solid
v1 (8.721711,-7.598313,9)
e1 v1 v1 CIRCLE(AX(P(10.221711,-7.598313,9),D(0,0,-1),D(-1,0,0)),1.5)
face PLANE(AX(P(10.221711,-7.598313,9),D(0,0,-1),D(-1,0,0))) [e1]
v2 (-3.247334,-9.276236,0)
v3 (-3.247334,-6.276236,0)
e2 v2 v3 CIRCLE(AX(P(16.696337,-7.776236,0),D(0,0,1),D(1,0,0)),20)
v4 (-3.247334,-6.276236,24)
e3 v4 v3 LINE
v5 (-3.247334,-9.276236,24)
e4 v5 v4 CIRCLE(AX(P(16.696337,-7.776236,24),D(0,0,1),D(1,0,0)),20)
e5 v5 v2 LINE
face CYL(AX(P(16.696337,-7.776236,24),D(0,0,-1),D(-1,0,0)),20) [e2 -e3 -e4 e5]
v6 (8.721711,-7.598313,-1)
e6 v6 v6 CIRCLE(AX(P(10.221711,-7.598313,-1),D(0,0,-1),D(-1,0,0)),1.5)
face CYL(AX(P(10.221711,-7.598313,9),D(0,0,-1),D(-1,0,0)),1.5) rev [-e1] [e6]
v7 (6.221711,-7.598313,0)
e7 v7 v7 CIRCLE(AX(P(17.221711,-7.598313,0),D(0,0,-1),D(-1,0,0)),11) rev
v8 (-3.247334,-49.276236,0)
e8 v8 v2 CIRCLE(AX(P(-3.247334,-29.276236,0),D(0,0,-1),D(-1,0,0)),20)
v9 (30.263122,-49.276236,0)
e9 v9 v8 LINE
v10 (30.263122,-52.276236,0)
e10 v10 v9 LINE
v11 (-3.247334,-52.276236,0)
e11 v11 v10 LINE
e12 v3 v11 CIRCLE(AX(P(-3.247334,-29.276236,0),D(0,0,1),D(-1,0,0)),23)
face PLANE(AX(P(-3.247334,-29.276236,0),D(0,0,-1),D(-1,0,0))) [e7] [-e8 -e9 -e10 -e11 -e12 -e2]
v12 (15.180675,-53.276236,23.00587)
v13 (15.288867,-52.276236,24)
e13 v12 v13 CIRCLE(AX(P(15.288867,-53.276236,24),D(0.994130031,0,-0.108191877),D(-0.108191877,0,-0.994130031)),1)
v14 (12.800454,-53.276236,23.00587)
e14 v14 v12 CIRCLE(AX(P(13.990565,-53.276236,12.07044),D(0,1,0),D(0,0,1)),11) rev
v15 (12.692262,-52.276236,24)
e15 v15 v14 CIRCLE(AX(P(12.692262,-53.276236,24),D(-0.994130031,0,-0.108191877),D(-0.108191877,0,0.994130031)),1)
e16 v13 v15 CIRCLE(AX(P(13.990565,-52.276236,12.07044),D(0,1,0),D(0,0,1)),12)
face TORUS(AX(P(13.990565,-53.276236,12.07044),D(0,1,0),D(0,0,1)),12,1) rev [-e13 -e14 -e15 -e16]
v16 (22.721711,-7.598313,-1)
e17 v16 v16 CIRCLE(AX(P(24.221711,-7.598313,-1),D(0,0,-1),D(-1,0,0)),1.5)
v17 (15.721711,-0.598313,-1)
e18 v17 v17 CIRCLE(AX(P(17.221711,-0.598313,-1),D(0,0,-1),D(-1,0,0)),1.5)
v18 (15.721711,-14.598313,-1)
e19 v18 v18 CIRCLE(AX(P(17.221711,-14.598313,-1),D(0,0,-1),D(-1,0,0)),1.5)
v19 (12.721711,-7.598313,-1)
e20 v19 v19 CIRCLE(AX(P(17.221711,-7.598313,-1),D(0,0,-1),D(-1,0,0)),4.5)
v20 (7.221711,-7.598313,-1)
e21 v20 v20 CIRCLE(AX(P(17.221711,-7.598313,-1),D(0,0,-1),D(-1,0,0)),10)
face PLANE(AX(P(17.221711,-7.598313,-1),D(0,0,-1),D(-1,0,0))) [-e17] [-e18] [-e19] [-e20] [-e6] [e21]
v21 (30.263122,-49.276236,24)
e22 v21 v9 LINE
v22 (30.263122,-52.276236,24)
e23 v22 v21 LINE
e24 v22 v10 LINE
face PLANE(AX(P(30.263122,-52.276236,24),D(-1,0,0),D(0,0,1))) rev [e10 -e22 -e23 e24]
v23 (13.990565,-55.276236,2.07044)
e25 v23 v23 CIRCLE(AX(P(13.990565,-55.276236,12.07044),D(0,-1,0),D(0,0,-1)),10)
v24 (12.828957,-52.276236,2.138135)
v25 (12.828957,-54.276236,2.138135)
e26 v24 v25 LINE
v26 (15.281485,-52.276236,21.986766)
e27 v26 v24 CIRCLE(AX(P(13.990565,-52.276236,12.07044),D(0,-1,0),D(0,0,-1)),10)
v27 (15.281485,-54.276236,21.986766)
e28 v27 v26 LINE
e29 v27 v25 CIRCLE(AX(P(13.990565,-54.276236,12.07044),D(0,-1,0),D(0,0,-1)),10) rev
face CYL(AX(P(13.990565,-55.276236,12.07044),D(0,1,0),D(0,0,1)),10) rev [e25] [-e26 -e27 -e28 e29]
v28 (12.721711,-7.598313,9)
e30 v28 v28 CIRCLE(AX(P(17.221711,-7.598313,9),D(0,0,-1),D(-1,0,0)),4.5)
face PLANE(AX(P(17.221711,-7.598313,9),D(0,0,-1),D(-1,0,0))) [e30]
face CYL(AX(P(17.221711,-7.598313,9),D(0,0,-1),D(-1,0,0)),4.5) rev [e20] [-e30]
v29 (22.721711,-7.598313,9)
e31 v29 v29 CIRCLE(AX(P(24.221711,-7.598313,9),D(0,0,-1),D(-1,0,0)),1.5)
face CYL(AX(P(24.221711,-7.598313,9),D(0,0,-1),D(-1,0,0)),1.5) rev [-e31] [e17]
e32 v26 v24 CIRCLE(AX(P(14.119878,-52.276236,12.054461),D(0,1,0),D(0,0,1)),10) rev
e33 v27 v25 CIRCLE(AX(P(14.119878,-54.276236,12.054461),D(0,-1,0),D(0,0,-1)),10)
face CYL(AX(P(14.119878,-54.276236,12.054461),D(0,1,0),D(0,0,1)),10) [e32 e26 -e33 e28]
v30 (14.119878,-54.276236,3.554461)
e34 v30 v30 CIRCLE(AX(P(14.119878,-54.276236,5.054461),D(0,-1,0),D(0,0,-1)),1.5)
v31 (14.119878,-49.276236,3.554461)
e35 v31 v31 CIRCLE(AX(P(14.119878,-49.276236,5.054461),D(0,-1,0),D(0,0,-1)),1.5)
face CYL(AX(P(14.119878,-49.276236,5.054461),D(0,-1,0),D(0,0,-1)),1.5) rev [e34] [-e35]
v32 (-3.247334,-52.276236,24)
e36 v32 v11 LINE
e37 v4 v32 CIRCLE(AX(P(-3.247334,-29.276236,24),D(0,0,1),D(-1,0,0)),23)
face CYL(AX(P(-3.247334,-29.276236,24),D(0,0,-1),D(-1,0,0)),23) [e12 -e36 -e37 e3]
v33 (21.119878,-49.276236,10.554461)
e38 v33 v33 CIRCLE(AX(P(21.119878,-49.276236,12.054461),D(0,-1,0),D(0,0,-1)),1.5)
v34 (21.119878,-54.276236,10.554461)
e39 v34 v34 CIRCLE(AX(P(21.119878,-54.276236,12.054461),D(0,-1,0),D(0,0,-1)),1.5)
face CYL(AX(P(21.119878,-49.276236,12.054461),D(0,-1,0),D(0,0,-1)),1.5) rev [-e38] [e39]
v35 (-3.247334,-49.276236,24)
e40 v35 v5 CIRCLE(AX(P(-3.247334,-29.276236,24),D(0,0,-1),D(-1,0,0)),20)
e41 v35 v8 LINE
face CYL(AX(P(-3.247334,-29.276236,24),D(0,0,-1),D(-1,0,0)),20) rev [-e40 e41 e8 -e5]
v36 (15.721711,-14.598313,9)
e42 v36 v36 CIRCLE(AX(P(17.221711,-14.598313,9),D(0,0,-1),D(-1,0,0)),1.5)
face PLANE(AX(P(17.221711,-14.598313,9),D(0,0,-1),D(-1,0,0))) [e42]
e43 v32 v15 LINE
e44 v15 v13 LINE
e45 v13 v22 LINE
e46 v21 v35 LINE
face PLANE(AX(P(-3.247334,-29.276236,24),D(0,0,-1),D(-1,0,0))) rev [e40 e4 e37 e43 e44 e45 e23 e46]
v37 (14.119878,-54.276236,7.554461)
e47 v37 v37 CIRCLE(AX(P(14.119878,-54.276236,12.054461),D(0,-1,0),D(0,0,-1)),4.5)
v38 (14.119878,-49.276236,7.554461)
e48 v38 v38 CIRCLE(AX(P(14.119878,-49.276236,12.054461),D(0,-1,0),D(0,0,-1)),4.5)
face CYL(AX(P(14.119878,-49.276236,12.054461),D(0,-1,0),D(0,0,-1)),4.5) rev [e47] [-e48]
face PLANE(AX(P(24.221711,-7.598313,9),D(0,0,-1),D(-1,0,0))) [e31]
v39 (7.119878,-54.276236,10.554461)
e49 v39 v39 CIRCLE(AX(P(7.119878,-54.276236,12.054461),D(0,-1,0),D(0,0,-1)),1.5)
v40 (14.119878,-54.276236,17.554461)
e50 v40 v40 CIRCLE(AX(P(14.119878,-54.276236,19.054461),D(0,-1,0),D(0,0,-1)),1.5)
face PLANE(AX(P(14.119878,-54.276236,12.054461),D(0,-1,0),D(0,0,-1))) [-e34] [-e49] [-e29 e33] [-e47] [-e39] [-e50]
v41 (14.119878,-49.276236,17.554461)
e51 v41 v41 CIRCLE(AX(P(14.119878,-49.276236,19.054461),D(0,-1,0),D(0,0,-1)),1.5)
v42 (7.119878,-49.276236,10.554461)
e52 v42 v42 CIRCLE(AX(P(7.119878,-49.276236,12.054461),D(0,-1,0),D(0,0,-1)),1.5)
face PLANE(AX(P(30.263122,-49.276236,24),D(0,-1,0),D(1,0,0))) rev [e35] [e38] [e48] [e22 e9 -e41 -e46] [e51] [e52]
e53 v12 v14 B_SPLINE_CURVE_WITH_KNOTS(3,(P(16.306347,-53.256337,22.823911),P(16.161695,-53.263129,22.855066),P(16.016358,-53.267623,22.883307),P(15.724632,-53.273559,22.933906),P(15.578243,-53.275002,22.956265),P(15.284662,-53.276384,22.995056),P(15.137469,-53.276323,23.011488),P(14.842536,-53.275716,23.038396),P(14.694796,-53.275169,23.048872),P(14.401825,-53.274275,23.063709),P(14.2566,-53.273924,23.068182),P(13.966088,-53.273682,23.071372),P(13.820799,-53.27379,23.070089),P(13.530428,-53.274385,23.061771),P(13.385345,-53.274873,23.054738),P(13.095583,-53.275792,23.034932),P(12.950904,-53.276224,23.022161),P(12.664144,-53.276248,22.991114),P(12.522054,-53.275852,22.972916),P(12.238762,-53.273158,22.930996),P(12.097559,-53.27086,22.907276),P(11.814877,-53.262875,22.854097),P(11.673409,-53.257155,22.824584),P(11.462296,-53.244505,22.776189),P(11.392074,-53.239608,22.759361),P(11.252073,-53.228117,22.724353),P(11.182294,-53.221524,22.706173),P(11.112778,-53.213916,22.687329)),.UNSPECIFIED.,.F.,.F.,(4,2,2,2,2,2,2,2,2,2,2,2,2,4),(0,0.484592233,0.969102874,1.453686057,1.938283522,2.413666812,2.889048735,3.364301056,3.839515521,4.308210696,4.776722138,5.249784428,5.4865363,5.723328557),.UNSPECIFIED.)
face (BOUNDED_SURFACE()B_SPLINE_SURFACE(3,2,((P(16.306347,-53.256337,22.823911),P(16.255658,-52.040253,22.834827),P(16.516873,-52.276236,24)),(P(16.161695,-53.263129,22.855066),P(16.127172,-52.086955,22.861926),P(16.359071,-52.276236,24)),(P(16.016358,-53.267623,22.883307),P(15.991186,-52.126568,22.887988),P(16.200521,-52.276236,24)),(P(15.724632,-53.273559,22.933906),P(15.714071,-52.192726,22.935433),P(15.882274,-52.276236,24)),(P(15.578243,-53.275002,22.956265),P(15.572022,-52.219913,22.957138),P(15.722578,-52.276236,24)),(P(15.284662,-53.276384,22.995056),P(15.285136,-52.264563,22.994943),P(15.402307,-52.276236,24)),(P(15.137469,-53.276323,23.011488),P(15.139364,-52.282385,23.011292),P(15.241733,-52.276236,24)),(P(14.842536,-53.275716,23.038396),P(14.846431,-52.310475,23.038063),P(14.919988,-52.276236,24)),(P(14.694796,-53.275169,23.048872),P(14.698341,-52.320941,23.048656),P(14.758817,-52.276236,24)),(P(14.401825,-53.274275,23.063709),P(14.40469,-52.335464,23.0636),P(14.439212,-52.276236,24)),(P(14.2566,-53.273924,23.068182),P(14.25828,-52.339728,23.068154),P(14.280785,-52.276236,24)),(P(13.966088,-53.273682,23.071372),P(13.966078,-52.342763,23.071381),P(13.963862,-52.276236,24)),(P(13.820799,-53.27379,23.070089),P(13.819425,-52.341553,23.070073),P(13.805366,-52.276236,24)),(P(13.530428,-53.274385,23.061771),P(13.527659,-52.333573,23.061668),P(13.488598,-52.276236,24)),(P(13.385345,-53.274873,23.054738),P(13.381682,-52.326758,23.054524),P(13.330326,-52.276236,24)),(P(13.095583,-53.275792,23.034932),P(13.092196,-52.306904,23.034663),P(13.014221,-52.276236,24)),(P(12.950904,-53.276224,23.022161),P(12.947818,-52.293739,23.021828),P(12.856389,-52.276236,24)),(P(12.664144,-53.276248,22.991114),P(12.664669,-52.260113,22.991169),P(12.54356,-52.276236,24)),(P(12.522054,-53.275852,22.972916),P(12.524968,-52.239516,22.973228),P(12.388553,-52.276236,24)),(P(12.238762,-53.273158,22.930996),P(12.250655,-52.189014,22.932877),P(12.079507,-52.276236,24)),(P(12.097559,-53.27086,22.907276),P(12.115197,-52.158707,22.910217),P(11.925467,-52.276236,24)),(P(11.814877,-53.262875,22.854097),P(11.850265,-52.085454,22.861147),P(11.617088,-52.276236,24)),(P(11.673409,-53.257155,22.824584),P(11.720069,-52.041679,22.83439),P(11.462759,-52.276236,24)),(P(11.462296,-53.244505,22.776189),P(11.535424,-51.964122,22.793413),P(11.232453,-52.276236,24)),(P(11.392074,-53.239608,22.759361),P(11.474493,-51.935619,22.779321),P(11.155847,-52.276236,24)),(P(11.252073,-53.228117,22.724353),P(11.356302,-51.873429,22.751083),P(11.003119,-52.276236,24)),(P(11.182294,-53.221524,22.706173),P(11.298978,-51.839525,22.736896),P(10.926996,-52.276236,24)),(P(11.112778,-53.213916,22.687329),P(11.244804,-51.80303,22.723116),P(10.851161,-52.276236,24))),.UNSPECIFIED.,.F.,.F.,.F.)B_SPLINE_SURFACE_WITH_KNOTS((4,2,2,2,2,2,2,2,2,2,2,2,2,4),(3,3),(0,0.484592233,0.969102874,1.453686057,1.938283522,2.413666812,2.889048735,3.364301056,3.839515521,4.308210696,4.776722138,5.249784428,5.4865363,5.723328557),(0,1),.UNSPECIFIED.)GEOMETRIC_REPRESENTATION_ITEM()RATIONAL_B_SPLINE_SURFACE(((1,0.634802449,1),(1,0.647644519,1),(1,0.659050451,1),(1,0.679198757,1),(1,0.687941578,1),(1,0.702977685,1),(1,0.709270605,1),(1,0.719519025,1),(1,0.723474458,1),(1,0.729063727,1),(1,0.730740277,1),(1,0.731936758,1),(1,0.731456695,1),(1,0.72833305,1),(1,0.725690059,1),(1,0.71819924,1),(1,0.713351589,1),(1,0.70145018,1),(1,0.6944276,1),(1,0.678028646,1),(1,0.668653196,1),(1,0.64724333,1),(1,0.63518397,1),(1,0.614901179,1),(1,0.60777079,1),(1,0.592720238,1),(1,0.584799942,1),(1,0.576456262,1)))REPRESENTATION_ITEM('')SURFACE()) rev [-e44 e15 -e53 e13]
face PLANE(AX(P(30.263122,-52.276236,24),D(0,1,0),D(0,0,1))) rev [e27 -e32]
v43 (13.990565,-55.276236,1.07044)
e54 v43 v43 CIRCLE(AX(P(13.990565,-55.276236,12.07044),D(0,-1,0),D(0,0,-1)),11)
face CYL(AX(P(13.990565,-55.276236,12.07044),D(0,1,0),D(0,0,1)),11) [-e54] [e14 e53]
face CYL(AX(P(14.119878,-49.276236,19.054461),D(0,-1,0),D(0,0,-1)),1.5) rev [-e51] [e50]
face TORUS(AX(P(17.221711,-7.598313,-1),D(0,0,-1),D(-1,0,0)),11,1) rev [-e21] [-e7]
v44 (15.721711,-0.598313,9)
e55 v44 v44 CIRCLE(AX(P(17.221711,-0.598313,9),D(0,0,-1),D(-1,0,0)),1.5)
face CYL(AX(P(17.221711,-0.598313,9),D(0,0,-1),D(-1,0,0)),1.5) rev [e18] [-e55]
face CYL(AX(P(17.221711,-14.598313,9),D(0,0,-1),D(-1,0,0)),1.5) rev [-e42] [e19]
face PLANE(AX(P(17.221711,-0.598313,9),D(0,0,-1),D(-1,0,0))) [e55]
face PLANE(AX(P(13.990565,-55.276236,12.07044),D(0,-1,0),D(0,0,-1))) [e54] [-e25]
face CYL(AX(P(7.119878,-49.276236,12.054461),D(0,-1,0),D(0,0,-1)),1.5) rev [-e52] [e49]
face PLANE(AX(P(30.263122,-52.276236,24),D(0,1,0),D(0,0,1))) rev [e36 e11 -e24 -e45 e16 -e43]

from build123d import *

# Parameters (mm, degrees)
BOSS_EXTRUDE1_DEPTH = 24
SKETCH2_R           = 10
BOSS_EXTRUDE2_DEPTH = 2
SKETCH3_R           = 1.5
SKETCH3_R_2         = 4.5
CUT_EXTRUDE1_DEPTH  = 5
SKETCH6_R           = 10
BOSS_EXTRUDE3_DEPTH = 1
FILLET2_R           = 1
SKETCH7_R           = 1.5
SKETCH7_R_2         = 4.5
CUT_EXTRUDE4_DEPTH  = 10
SKETCH9_R           = 11
SKETCH9_R_2         = 10
BOSS_EXTRUDE4_DEPTH = 3
FILLET3_R           = 1


with BuildPart() as part:
    # Sketch1 → Boss-Extrude1 (new body)
    with BuildSketch(Plane.XY):
        with BuildLine():
            Line((30.263122148, -52.276236142), (30.263122148, -49.276236142))
            Line((30.263122148, -49.276236142), (-3.247333847, -49.276236142))
            ThreePointArc((-3.247333847, -49.276236142), (-23.247333847, -29.276236142), (-3.247333847, -9.276236142))
            ThreePointArc((-3.247333847, -9.276236142), (36.696336828, -7.776236142), (-3.247333847, -6.276236142))
            ThreePointArc((-3.247333847, -6.276236142), (-26.247333847, -29.276236142), (-3.247333847, -52.276236142))
            Line((-3.247333847, -52.276236142), (30.263122148, -52.276236142))
        make_face()
    extrude(amount=BOSS_EXTRUDE1_DEPTH)

    # Sketch2 → Boss-Extrude2 (add)
    with BuildSketch(Plane.XZ.offset(52.276236142)):
        with Locations(Location((14.119877924, 12.054461488, 0), (0, 0, 90))):
            Circle(SKETCH2_R)
    extrude(amount=BOSS_EXTRUDE2_DEPTH)

    # Sketch3 → Cut-Extrude1 (cut)
    with BuildSketch(Plane.XZ.offset(54.276236142)):
        with Locations(Location((14.119877924, 19.054461488, 0), (0, 0, 270))):
            Circle(SKETCH3_R)
        with Locations(Location((21.119877924, 12.054461488, 0), (0, 0, 270))):
            Circle(SKETCH3_R)
        with Locations(Location((14.119877924, 5.054461488, 0), (0, 0, 270))):
            Circle(SKETCH3_R)
        with Locations(Location((7.119877924, 12.054461488, 0), (0, 0, 270))):
            Circle(SKETCH3_R)
        with Locations(Location((14.119877924, 12.054461488, 0), (0, 0, 270))):
            Circle(SKETCH3_R_2)
    extrude(amount=-CUT_EXTRUDE1_DEPTH, mode=Mode.SUBTRACT)

    # Sketch6 → Boss-Extrude3 (add)
    with BuildSketch(Plane(origin=(0, 0, 0), x_dir=(-1, 0, 0), z_dir=(0, 0, -1))):
        with Locations((-17.221710812, -7.598312744)):
            Circle(SKETCH6_R)
    extrude(amount=BOSS_EXTRUDE3_DEPTH)

    # Fillet2
    fillet2_edges = [part.edges().sort_by_distance(p)[0] for p in [
        (27.221710812, -7.598312744, 0),
    ]]
    fillet(fillet2_edges, radius=FILLET2_R - 0.0001)  # a hair under: the kernel refuses the full size

    # Sketch7 → Cut-Extrude4 (cut)
    with BuildSketch(Plane(origin=(0, 0, -1), x_dir=(-1, 0, 0), z_dir=(0, 0, -1))):
        with Locations((-17.221710812, -0.598312744)):
            Circle(SKETCH7_R)
        with Locations((-10.221710812, -7.598312744)):
            Circle(SKETCH7_R)
        with Locations((-17.221710812, -14.598312744)):
            Circle(SKETCH7_R)
        with Locations((-24.221710812, -7.598312744)):
            Circle(SKETCH7_R)
        with Locations((-17.221710812, -7.598312744)):
            Circle(SKETCH7_R_2)
    extrude(amount=-CUT_EXTRUDE4_DEPTH, mode=Mode.SUBTRACT)

    # Sketch9 → Boss-Extrude4 (add)
    with BuildSketch(Plane.XZ.offset(52.276236142)):
        with Locations(Location((13.990564712, 12.070439632, 0), (0, 0, 90))):
            Circle(SKETCH9_R)
        with Locations(Location((13.990564712, 12.070439632, 0), (0, 0, 82.582870782))):
            Circle(SKETCH9_R_2, mode=Mode.SUBTRACT)
    extrude(amount=BOSS_EXTRUDE4_DEPTH)

    # Fillet3
    fillet3_edges = [part.edges().sort_by_distance(p)[0] for p in [
        (13.990564712, -52.276236142, 1.070439632),
    ]]
    fillet(fillet3_edges, radius=FILLET3_R)


solid = part.part
